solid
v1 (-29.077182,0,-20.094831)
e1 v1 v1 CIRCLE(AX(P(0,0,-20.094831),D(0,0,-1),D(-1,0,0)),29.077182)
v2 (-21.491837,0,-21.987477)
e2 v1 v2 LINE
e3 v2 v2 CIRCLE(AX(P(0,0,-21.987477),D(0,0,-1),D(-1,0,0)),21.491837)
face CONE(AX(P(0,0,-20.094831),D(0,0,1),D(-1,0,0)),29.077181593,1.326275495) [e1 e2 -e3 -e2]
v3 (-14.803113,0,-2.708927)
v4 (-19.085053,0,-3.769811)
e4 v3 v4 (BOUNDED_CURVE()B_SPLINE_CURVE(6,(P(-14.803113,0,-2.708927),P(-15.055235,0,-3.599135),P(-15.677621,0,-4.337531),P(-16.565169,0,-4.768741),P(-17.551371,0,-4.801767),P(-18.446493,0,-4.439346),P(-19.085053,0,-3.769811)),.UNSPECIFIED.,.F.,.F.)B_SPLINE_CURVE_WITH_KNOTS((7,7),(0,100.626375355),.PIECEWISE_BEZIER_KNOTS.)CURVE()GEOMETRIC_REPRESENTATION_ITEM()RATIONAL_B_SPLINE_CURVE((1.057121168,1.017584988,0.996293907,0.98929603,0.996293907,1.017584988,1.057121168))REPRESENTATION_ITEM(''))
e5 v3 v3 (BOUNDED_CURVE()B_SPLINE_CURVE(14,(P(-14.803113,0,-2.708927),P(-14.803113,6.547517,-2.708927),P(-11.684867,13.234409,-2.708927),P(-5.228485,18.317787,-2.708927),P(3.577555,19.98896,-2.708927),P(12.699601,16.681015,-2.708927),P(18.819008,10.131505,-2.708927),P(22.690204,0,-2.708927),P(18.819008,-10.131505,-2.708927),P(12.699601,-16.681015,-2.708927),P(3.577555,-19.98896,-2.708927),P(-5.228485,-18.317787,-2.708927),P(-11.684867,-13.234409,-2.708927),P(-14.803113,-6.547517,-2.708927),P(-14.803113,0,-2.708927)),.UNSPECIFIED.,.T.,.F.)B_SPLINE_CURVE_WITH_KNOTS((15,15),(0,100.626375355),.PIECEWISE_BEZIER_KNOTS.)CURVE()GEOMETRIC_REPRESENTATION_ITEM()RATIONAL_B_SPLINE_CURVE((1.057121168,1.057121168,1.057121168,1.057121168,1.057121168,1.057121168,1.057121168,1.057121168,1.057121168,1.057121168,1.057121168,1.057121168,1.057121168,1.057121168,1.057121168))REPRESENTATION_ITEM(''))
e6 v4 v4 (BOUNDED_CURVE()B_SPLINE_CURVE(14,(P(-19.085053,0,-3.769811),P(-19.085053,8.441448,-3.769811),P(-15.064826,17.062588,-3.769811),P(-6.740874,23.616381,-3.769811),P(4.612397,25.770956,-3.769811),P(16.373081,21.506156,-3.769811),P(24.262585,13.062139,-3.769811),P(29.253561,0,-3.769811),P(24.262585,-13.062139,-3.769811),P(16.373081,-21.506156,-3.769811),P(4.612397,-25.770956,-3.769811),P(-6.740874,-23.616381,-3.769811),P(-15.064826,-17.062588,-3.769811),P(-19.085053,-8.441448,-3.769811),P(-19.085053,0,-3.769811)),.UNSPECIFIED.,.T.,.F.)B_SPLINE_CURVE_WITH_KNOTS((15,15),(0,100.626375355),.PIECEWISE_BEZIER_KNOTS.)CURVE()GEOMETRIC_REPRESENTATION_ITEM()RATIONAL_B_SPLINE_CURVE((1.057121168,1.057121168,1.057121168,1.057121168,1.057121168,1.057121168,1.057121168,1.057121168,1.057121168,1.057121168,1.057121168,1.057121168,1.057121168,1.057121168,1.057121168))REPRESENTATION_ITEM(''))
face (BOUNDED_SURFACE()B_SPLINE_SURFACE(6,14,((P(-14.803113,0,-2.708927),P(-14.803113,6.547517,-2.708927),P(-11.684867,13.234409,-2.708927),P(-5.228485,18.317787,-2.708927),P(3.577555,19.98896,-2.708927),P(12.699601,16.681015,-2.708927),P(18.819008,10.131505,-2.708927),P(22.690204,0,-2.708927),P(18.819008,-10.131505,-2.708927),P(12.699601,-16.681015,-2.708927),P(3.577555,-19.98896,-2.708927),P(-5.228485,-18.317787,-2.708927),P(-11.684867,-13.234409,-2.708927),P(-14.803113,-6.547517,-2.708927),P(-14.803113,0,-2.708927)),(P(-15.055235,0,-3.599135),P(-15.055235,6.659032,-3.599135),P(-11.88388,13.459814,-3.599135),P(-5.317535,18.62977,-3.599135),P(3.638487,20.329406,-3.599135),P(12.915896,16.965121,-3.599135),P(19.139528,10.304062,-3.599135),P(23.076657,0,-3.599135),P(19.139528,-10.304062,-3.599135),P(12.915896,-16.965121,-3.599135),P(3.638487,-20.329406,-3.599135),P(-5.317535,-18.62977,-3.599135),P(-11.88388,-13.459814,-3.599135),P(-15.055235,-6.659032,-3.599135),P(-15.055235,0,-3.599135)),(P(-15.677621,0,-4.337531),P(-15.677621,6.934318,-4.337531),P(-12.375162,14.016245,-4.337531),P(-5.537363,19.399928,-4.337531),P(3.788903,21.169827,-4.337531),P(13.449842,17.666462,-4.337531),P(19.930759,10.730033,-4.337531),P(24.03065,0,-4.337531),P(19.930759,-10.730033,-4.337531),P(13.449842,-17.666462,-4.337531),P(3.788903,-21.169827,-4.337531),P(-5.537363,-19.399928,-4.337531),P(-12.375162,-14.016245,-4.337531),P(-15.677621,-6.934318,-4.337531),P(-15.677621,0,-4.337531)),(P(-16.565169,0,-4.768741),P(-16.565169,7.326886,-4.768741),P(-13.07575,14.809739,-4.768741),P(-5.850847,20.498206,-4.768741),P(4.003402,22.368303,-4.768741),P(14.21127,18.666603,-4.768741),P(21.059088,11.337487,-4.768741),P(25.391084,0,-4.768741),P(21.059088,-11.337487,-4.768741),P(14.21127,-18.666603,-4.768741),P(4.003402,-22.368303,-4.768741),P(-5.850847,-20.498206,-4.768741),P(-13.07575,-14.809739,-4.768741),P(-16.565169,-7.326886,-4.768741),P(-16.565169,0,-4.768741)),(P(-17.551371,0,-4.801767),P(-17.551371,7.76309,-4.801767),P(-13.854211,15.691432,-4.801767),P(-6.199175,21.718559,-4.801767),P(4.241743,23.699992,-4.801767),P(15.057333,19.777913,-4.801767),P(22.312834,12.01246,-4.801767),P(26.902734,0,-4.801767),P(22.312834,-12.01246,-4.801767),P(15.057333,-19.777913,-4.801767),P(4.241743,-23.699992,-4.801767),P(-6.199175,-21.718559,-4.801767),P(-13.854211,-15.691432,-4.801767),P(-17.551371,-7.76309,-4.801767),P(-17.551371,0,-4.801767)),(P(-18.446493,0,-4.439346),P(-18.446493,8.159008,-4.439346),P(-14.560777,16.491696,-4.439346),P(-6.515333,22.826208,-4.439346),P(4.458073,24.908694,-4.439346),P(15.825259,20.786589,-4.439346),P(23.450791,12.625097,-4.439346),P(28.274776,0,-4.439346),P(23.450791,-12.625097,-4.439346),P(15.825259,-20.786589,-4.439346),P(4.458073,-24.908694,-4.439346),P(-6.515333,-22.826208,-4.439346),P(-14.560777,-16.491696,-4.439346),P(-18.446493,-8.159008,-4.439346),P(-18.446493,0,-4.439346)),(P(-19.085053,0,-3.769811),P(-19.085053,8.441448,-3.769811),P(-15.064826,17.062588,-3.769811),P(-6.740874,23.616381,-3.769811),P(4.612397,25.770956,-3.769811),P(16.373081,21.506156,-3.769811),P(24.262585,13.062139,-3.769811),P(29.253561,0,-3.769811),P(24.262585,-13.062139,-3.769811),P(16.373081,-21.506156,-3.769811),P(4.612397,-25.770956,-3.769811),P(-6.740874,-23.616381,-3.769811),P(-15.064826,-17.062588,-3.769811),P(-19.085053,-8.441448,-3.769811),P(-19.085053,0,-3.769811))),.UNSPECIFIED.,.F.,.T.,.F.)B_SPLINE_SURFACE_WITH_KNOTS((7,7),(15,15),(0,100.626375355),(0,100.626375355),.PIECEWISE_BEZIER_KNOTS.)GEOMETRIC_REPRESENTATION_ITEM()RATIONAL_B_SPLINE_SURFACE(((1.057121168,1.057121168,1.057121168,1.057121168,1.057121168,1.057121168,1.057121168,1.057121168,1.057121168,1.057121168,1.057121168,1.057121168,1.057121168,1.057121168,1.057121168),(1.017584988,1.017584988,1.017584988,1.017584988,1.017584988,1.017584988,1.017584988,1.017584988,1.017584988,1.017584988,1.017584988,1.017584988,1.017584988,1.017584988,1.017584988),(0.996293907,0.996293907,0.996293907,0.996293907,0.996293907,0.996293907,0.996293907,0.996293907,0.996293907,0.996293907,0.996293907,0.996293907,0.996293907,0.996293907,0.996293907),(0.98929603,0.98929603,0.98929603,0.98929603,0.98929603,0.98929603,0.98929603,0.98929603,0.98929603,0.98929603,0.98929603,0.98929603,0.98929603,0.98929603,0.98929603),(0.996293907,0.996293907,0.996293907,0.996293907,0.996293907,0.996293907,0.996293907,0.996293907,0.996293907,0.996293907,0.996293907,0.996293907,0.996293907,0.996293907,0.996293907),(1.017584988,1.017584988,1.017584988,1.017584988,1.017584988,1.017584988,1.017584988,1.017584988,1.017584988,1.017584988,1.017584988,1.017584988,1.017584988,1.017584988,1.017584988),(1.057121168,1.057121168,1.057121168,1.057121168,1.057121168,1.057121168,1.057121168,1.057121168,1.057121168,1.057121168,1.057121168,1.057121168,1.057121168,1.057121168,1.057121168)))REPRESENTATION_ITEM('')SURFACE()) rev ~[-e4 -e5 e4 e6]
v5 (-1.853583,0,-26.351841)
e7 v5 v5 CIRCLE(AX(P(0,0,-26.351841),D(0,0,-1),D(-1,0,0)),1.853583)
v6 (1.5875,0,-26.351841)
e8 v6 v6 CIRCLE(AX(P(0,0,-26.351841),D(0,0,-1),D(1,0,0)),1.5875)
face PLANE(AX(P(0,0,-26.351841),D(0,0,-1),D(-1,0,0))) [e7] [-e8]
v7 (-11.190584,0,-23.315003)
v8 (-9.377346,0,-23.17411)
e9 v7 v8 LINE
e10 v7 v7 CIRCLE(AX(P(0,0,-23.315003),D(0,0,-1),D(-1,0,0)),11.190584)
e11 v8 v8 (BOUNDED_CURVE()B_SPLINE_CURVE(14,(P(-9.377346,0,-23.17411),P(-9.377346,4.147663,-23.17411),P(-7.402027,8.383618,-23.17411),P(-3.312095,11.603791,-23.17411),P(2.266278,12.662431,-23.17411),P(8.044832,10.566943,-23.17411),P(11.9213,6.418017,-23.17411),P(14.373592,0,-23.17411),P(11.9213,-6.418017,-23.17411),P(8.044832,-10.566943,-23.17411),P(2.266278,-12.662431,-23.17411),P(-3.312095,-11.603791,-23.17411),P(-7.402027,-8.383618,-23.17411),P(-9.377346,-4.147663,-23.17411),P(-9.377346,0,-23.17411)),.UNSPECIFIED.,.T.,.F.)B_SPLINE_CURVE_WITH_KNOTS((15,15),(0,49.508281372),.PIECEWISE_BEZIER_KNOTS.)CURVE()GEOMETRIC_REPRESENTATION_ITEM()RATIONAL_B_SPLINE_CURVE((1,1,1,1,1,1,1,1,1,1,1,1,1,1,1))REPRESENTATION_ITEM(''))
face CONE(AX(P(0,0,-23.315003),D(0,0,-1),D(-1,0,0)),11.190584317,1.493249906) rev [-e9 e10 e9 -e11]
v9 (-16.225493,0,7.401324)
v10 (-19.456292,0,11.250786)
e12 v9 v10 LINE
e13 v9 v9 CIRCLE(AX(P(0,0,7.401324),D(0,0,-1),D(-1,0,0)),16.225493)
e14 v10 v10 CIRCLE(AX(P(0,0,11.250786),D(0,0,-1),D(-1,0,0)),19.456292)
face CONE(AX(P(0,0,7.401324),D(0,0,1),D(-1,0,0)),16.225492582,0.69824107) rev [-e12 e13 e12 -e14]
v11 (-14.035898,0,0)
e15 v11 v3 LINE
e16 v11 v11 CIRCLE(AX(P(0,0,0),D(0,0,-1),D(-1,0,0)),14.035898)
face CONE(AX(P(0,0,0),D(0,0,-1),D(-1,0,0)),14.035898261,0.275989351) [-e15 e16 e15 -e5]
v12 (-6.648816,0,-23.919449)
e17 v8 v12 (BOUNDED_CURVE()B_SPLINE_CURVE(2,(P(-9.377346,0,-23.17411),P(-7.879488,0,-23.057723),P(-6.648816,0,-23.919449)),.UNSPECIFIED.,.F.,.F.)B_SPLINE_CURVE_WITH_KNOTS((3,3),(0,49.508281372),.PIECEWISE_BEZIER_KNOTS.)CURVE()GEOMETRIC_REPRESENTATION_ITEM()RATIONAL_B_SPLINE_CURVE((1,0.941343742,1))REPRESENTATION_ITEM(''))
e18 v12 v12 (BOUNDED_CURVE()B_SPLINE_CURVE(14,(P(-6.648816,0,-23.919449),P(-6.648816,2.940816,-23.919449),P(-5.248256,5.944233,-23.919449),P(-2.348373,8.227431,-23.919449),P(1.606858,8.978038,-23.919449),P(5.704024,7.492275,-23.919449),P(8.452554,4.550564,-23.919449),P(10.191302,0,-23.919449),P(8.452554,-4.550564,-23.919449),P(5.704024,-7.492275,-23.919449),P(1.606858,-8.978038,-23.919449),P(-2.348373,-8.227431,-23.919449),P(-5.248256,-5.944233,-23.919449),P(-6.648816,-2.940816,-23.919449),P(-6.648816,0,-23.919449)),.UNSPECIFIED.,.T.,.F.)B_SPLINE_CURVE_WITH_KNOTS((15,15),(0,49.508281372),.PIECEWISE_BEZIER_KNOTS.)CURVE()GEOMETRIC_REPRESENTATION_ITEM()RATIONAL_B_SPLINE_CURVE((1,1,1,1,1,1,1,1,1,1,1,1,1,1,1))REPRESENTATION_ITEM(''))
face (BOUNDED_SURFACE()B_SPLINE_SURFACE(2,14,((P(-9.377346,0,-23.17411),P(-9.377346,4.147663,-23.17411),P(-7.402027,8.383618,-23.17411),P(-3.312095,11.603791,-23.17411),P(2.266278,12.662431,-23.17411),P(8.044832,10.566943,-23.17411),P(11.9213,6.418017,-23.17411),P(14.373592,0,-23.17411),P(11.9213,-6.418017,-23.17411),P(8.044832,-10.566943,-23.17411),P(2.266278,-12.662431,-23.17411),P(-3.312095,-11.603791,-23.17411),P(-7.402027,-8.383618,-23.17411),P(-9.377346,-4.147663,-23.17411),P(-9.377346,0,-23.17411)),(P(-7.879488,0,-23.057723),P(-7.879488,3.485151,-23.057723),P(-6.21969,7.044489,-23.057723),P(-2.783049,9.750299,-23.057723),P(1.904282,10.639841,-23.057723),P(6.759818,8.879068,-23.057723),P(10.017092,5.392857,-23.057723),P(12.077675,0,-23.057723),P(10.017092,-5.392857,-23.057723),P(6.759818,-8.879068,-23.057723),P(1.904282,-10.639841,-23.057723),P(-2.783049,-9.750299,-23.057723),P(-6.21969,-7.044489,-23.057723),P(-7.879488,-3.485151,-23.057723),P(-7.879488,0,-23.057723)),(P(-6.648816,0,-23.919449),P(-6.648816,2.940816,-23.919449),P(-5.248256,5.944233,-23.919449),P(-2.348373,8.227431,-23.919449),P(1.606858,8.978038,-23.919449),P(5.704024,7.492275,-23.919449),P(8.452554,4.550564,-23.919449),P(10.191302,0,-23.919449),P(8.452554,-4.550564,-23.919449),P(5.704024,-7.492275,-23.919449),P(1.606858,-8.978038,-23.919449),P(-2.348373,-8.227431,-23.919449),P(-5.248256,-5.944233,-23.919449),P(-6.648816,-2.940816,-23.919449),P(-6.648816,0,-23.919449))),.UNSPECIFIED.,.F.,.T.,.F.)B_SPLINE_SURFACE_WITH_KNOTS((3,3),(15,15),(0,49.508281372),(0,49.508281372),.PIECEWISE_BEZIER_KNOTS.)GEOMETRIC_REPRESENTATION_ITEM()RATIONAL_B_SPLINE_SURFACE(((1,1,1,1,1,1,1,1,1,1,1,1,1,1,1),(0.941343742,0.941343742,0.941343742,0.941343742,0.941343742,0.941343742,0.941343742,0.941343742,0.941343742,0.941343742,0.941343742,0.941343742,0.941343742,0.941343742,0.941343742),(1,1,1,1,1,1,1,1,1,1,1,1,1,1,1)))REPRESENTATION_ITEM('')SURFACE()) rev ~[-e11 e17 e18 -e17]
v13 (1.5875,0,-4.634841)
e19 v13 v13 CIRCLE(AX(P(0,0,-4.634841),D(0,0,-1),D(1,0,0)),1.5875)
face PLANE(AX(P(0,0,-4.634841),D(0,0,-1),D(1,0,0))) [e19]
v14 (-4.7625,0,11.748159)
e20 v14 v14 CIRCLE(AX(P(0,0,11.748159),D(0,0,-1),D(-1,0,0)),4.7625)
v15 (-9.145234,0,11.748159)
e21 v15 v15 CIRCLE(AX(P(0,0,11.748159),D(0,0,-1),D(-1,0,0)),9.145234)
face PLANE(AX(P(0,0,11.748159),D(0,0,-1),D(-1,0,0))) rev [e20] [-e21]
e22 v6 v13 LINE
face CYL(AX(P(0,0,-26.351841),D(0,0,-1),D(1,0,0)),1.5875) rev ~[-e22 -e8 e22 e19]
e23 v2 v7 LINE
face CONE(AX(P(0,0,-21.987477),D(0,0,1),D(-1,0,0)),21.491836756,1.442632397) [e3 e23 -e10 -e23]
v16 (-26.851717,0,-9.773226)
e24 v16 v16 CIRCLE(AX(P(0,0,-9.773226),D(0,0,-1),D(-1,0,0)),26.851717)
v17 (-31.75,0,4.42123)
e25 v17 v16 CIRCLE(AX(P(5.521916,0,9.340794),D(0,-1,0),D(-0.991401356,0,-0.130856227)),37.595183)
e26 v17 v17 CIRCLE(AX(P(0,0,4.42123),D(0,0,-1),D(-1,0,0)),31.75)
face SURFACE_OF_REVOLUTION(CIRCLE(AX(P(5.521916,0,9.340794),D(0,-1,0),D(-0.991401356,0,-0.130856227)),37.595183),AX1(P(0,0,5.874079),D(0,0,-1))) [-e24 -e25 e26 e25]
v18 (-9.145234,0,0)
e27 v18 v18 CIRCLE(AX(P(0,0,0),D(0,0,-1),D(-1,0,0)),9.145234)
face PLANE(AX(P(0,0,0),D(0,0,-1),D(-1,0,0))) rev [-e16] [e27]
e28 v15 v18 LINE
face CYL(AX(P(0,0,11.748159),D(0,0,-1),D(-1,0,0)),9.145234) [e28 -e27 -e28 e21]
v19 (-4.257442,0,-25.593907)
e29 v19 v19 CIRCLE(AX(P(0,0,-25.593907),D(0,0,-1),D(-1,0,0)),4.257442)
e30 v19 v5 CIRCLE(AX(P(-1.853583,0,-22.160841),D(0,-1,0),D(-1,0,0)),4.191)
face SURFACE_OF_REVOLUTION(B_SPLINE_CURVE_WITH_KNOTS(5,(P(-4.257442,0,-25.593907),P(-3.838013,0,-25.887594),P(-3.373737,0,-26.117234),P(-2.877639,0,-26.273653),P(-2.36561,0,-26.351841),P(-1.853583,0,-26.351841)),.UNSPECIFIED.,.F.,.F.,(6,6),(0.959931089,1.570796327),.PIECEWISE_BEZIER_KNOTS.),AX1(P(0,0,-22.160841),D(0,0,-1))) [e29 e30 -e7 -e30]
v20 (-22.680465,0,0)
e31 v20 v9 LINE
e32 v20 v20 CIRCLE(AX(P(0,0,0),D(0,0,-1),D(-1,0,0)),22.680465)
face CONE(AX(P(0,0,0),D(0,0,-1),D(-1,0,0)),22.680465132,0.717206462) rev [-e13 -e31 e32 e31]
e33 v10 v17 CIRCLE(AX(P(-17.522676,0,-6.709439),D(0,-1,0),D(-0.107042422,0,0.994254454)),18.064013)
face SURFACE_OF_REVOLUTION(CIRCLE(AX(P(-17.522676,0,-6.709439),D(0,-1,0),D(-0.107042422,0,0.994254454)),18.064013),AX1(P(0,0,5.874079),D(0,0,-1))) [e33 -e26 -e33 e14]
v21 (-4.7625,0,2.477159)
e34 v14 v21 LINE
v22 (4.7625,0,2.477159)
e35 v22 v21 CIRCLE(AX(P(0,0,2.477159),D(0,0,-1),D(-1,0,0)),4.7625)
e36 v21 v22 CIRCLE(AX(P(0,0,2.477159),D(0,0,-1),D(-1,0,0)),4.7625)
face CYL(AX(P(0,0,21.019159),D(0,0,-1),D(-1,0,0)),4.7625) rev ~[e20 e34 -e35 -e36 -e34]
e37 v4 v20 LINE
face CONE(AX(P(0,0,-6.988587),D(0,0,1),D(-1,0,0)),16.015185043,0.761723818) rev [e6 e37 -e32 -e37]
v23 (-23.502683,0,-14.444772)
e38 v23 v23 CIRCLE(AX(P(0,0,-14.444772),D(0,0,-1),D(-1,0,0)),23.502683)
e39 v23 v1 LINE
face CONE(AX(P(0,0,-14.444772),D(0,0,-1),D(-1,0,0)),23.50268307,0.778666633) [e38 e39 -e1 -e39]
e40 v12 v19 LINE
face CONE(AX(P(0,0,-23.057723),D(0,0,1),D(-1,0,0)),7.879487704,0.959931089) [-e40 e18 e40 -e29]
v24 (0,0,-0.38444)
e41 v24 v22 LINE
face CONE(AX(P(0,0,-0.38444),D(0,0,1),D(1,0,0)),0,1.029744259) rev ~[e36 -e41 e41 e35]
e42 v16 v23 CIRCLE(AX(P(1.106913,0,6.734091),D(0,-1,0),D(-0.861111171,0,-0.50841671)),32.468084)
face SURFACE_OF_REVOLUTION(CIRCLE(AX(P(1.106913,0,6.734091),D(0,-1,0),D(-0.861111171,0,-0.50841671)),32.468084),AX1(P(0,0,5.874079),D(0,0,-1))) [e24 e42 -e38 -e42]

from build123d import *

# Parameters (mm, degrees)
F3_D     = 9.525
F3_DEPTH = 9.271
F3_TIP   = 2.8615986981
F4_R     = 1.5875
F5_DEPTH = 21.717
F6_R     = 2.54
F7_R     = 4.191


with BuildPart() as f1:
    # F0 (on Front) → F1 (revolve)
    with BuildSketch(Plane.XZ):
        with BuildLine():
            Line((0, -26.3518410662), (0, 0))
            Line((0, 0), (0, 11.7481589338))
            Line((0, 11.7481589338), (-9.1452337801, 11.7481589338))
            Line((-9.1452337801, 11.7481589338), (-9.1452337801, 0))
            Line((-9.1452337801, 0), (-14.0358982608, 0))
            Line((-14.0358982608, 0), (-16.0151850432, -6.9885868579))
            Line((-16.0151850432, -6.9885868579), (-22.680465132, 0))
            Line((-22.680465132, 0), (-16.2254925817, 7.4013243429))
            Line((-16.2254925817, 7.4013243429), (-19.4562915713, 11.250785552))
            ThreePointArc((-19.4562915713, 11.250785552), (-26.295058761, 9.081502601), (-31.75, 4.4212299399))
            ThreePointArc((-31.75, 4.4212299399), (-30.0167425827, -2.9230382279), (-26.851716639, -9.7732255955))
            ThreePointArc((-26.851716639, -9.7732255955), (-25.2807815933, -12.1832568025), (-23.5026830704, -14.4447724402))
            Line((-23.5026830704, -14.4447724402), (-29.0771815926, -20.0948305428))
            Line((-29.0771815926, -20.0948305428), (-21.4918367565, -21.9874773175))
            Line((-21.4918367565, -21.9874773175), (-11.1905843171, -23.3150029238))
            Line((-11.1905843171, -23.3150029238), (-7.8794877043, -23.0577233122))
            Line((-7.8794877043, -23.0577233122), (-3.175, -26.3518410662))
            Line((-3.175, -26.3518410662), (0, -26.3518410662))
        make_face()
    revolve(axis=Axis((0, 0, 5.8740794669), (0, 0, -1)))

    # F3
    with Locations(Plane.XY.offset(11.7481589338)):
        with Locations((0, 0)):
            Hole(F3_D / 2, depth=F3_DEPTH)
            with Locations((0, 0, -(F3_DEPTH + F3_TIP / 2))):  # 118° drill point
                Cone(0, F3_D / 2, F3_TIP, mode=Mode.SUBTRACT)

    # F4 (on face) → F5 (cut)
    with BuildSketch(Plane(origin=(0, 0, -26.3518410662), x_dir=(1, 0, 0), z_dir=(0, 0, -1))):
        Circle(F4_R)
    extrude(amount=-F5_DEPTH, mode=Mode.SUBTRACT)

    # F6
    f6_edges = [f1.edges().sort_by_distance(p)[0] for p in [
        (16.015185, 0, -6.988587),
    ]]
    fillet(f6_edges, radius=F6_R)

    # F7
    f7_edges = [f1.edges().sort_by_distance(p)[0] for p in [
        (7.879488, 0, -23.057723),
        (3.175, 0, -26.351841),
    ]]
    fillet(f7_edges, radius=F7_R)


solid = f1.part
